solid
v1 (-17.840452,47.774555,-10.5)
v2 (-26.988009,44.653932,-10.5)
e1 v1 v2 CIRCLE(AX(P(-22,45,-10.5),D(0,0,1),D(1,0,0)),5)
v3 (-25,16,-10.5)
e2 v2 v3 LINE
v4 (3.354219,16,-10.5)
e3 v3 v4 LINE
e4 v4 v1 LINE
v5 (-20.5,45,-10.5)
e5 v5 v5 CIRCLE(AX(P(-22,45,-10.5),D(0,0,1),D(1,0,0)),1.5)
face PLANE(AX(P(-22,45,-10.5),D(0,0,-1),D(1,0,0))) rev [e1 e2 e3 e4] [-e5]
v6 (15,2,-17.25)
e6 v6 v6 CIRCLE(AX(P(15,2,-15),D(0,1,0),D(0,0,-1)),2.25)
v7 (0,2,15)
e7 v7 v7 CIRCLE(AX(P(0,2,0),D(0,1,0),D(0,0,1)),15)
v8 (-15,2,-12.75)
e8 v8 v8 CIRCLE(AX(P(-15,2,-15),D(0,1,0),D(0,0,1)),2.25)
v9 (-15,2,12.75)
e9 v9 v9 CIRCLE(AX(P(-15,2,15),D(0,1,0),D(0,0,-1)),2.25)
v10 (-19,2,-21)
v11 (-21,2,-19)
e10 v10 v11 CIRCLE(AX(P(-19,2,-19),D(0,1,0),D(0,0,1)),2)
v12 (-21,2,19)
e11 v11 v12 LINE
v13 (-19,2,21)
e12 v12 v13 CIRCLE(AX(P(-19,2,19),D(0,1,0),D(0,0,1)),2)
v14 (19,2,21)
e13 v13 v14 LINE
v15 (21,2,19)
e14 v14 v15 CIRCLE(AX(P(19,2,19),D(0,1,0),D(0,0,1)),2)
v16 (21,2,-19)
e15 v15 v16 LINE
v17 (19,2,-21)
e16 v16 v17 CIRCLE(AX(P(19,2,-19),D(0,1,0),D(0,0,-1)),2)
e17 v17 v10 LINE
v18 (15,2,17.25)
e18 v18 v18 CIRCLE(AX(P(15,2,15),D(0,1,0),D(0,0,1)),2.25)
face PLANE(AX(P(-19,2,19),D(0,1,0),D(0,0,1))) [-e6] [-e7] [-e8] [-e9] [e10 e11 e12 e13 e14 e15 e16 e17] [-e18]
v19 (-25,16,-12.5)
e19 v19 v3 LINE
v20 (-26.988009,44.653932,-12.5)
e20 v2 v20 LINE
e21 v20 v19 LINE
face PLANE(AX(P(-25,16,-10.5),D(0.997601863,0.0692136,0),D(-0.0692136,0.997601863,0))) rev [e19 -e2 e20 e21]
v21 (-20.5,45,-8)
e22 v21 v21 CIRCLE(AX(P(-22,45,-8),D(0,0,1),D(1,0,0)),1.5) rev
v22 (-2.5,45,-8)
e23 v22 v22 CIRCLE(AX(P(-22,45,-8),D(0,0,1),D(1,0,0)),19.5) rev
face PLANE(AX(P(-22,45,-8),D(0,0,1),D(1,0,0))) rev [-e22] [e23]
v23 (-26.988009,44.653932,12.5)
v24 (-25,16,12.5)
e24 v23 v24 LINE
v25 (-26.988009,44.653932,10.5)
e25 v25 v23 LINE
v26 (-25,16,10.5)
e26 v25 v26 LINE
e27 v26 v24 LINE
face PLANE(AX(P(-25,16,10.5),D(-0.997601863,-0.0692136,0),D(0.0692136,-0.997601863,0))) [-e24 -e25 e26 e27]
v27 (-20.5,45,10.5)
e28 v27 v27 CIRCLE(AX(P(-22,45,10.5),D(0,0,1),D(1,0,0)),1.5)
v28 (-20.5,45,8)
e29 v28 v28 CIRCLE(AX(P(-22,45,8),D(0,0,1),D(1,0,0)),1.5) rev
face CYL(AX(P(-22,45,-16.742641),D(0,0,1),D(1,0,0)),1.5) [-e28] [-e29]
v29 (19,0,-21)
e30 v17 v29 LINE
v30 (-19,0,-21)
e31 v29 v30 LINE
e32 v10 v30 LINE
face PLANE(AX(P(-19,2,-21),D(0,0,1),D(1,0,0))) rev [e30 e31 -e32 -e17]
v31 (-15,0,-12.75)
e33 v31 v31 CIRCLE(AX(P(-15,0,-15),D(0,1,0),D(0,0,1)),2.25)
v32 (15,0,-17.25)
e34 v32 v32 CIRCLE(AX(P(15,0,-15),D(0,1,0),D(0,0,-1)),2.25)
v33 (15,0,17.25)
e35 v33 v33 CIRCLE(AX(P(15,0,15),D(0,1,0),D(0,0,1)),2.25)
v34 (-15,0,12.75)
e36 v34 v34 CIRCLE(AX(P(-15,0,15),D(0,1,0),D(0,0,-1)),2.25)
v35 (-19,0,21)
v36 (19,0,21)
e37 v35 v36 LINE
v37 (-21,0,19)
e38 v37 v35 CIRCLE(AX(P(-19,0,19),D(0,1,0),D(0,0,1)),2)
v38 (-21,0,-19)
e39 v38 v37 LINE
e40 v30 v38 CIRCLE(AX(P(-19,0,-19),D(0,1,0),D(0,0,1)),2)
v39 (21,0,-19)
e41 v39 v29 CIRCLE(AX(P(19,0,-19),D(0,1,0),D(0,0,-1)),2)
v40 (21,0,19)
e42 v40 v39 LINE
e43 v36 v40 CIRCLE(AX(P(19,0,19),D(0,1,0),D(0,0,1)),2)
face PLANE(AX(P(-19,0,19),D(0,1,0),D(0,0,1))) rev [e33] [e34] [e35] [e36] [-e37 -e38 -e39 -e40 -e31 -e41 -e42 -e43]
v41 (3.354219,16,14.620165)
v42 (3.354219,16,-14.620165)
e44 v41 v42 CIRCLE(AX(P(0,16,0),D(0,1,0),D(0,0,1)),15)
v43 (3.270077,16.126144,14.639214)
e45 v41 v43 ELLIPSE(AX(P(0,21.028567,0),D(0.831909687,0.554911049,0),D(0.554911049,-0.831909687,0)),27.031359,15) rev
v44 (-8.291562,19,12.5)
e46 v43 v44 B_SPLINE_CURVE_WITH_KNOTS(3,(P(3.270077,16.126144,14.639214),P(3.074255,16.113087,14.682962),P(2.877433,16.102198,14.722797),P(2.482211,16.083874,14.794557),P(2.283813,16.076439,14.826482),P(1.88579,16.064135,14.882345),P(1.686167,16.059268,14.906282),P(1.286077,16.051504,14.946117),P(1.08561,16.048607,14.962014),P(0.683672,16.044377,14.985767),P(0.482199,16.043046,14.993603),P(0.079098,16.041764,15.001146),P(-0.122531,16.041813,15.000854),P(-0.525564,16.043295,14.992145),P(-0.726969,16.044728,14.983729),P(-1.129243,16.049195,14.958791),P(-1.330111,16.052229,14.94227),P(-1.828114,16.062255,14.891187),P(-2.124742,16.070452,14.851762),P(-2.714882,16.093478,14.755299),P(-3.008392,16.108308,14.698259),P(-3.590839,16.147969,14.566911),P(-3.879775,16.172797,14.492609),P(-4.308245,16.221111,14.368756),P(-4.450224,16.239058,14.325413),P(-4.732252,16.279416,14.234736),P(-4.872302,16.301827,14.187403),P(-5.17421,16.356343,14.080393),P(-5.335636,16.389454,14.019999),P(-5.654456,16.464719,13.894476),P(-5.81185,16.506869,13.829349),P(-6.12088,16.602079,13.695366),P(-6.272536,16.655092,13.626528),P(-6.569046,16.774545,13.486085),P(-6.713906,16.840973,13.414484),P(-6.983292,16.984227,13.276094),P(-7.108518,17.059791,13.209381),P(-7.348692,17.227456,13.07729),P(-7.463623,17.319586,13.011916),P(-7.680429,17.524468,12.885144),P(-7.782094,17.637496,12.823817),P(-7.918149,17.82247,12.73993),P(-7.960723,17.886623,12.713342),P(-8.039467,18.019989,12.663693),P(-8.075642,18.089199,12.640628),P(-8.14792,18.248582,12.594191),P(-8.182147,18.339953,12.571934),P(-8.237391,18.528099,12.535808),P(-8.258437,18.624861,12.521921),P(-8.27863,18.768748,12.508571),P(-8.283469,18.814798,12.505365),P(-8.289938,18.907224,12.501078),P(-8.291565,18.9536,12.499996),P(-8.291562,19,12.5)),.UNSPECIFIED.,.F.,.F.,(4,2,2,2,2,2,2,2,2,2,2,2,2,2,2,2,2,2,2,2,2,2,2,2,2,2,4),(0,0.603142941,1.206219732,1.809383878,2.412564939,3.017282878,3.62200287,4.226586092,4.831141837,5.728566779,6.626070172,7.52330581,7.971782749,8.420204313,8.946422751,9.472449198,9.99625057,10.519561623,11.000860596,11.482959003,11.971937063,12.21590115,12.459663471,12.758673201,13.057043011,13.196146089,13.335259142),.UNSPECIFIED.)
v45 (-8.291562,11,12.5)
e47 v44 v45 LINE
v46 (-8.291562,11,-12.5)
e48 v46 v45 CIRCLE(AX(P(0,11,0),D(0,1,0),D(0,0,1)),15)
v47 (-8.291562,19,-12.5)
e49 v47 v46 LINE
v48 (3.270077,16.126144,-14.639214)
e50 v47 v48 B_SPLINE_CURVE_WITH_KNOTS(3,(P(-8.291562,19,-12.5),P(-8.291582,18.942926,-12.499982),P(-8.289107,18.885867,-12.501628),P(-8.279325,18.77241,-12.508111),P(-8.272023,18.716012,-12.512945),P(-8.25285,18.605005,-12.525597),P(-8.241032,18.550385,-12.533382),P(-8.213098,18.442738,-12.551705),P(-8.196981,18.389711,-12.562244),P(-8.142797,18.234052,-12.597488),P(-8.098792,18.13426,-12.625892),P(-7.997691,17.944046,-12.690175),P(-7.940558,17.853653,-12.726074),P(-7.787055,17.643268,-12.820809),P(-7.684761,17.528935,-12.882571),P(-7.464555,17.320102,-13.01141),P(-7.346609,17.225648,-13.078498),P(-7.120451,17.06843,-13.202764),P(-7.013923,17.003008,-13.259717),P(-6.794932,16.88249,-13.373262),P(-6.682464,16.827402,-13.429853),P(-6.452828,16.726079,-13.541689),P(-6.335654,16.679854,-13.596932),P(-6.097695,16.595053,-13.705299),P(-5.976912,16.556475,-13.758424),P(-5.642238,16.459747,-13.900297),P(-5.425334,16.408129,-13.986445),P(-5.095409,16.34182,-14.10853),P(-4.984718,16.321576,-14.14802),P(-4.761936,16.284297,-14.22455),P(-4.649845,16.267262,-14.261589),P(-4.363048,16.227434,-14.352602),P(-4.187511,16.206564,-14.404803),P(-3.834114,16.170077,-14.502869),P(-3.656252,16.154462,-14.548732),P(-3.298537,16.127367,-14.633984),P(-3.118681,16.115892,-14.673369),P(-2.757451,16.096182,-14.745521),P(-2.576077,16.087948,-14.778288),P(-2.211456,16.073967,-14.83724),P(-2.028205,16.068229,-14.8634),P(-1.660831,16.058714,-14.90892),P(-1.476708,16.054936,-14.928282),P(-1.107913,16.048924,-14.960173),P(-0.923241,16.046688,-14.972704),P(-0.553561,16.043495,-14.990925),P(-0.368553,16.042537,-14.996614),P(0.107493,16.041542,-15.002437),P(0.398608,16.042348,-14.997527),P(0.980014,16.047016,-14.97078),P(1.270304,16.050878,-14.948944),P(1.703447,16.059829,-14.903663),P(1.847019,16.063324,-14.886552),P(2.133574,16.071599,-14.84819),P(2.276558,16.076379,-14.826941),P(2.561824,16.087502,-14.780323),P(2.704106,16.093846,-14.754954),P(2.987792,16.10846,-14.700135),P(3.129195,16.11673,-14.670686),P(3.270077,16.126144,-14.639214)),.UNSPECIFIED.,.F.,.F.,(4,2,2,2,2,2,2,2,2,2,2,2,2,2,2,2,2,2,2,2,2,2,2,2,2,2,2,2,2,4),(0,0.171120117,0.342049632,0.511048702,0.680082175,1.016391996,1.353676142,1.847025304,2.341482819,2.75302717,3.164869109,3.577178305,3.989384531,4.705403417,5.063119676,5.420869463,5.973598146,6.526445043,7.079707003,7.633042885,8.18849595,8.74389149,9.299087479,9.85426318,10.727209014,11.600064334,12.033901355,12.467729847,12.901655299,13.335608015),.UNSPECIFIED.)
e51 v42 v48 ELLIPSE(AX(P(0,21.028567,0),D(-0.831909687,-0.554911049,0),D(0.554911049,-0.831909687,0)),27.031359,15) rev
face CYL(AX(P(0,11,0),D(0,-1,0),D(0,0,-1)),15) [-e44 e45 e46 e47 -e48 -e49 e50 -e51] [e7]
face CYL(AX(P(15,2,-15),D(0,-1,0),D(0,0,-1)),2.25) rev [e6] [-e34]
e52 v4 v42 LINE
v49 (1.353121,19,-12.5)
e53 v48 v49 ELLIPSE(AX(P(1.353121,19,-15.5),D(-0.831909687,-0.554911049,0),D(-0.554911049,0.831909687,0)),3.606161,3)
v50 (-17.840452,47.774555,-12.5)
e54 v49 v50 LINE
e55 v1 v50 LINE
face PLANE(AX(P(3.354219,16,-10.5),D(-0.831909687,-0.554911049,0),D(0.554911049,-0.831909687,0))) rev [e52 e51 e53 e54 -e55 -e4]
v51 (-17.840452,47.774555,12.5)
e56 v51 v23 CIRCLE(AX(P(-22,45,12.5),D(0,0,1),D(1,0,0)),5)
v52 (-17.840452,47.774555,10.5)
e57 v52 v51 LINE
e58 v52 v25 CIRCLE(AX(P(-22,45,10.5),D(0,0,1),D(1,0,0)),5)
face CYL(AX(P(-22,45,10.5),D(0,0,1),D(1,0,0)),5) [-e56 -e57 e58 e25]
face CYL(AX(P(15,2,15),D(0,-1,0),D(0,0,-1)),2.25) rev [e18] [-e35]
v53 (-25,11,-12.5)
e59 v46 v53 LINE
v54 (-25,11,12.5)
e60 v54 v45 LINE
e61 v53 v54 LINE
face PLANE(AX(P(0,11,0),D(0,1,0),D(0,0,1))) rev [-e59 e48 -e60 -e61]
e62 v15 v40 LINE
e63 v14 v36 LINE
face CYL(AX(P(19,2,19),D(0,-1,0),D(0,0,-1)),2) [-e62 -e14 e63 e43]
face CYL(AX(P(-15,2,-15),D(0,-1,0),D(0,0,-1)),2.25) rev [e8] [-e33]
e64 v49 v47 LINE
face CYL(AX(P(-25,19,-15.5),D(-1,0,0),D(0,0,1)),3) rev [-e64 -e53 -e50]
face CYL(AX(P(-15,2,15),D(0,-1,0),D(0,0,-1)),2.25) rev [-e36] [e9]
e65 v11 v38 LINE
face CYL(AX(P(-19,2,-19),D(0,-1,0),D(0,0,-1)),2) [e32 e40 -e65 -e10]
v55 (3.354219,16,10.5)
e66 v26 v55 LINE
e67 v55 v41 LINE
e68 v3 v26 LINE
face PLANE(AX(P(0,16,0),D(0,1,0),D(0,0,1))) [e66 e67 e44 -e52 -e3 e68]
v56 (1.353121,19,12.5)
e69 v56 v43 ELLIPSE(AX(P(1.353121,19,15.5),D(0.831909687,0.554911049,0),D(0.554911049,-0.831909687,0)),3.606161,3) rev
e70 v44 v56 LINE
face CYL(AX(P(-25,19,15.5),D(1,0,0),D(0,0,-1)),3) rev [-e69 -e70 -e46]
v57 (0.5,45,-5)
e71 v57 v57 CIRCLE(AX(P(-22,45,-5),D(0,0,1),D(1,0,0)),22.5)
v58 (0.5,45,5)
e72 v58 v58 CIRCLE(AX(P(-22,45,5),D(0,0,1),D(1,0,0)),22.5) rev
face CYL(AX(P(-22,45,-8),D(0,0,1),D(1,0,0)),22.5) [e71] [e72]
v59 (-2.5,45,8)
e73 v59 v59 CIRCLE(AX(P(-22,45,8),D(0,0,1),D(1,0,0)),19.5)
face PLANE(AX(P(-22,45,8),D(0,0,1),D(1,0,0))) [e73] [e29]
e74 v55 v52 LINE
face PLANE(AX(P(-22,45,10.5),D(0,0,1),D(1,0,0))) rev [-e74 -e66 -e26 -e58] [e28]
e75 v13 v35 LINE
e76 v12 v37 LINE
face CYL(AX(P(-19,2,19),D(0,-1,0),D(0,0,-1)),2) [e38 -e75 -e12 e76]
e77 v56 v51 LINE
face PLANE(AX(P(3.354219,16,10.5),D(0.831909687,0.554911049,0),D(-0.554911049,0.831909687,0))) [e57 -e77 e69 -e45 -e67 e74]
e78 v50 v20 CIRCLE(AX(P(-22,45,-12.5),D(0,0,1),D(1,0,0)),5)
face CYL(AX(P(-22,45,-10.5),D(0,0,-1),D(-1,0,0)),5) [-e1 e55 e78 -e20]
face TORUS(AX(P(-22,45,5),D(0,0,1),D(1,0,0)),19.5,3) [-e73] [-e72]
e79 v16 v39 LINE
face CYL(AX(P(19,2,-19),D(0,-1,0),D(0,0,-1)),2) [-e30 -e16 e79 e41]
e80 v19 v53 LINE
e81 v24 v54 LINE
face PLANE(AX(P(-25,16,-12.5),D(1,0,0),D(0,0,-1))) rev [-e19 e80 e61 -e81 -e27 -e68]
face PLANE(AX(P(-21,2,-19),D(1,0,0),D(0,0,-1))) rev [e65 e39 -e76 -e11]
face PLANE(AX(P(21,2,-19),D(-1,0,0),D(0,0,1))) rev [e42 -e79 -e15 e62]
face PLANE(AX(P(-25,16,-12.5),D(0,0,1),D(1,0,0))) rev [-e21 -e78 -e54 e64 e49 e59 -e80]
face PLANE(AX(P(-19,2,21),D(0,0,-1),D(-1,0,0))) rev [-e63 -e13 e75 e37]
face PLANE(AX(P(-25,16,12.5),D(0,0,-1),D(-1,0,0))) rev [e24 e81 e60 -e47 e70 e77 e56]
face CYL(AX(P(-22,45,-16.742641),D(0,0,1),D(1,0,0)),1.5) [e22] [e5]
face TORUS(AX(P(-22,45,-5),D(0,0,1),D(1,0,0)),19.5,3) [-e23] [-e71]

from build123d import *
from build123d.topology import SkipClean

# Parameters (mm, degrees)
SKETCH1_R                = 2.25
BOSS_EXTRUDE1_DEPTH      = 2
SKETCH2_R                = 15
BOSS_EXTRUDE2_DEPTH      = 9
BOSS_EXTRUDE3_DEPTH      = 5
SKETCH4_R                = 1.5
BOSS_EXTRUDE4_DEPTH      = 2
FILLET1_R                = 3
BOSS_EXTRUDE5_DEPTH      = 8
BOSS_EXTRUDE5_DEPTH_BACK = 8
SKETCH5_R                = 22.5
FILLET2_R                = 3
SKETCH6_R                = 1.5
BOSS_EXTRUDE6_DEPTH      = 25


with BuildPart() as part:
    # Sketch1 → Boss-Extrude1 (new body)
    with BuildSketch(Plane(origin=(0, 0, 0), x_dir=(1, 0, 0), z_dir=(0, 1, 0))):
        with BuildLine():
            Line((-19, 21), (19, 21))
            ThreePointArc((19, 21), (20.414213562, 20.414213562), (21, 19))
            Line((21, 19), (21, -19))
            ThreePointArc((21, -19), (20.414213562, -20.414213562), (19, -21))
            Line((19, -21), (-19, -21))
            ThreePointArc((-19, -21), (-20.414213562, -20.414213562), (-21, -19))
            Line((-21, -19), (-21, 19))
            ThreePointArc((-21, 19), (-20.414213562, 20.414213562), (-19, 21))
        make_face()
        with Locations(Location((-15, 15, 0), (0, 0, 270))):
            Circle(SKETCH1_R, mode=Mode.SUBTRACT)
        with Locations(Location((15, 15, 0), (0, 0, 90))):
            Circle(SKETCH1_R, mode=Mode.SUBTRACT)
        with Locations(Location((15, -15, 0), (0, 0, 270))):
            Circle(SKETCH1_R, mode=Mode.SUBTRACT)
        with Locations(Location((-15, -15, 0), (0, 0, 90))):
            Circle(SKETCH1_R, mode=Mode.SUBTRACT)
    extrude(amount=BOSS_EXTRUDE1_DEPTH)

    # Sketch2 → Boss-Extrude2 (add)
    with BuildSketch(Plane(origin=(0, 2, 0), x_dir=(1, 0, 0), z_dir=(0, 1, 0))):
        with Locations(Location((0, 0, 0), (0, 0, 270))):
            Circle(SKETCH2_R)
    extrude(amount=BOSS_EXTRUDE2_DEPTH)

    # Sketch3 → Boss-Extrude3 (add)
    with SkipClean():  # the faces are left unmerged after this step: merging them gives an invalid solid
        with BuildSketch(Plane(origin=(0, 11, 0), x_dir=(1, 0, 0), z_dir=(0, 1, 0))):
            with BuildLine():
                Line((-25, 12.5), (-8.291561976, 12.5))
                ThreePointArc((-8.291561976, 12.5), (15, 0), (-8.291561976, -12.5))
                Line((-8.291561976, -12.5), (-25, -12.5))
                Line((-25, -12.5), (-25, 12.5))
            make_face()
        extrude(amount=BOSS_EXTRUDE3_DEPTH)

    # Sketch4 → Boss-Extrude4 (add)
    with SkipClean():  # the faces are left unmerged after this step: merging them gives an invalid solid
        with BuildSketch(Plane.XY.offset(12.5)):
            with BuildLine():
                Line((-25, 16), (-26.988009316, 44.653931998))
                ThreePointArc((-26.988009316, 44.653931998), (-23.614360312, 49.732213096), (-17.840451563, 47.774555244))
                Line((-17.840451563, 47.774555244), (3.354219012, 16))
                Line((3.354219012, 16), (-25, 16))
            make_face()
            with Locations((-22, 45)):
                Circle(SKETCH4_R, mode=Mode.SUBTRACT)
        boss_extrude4 = extrude(amount=-BOSS_EXTRUDE4_DEPTH)

    # Mirror1: Boss-Extrude4 across plane
    with SkipClean():  # the faces are left unmerged after this step: merging them gives an invalid solid
        add(boss_extrude4.mirror(Plane.XY))

    # Fillet1
    # the kernel refuses this fillet: 3 mm, written as the material it adds along each edge
    with BuildSketch(Plane(origin=(10.854219012, 16, 12.5), x_dir=(0, 0, 1), z_dir=(-1, 0, 0))) as fillet1_piece_1_section:
        with BuildLine():
            CenterArc((FILLET1_R, FILLET1_R), FILLET1_R, 180, 90)
            Line((0, FILLET1_R), (0, 0))
            Line((0, 0), (FILLET1_R, 0))
        make_face()
    fillet1_piece_1 = extrude(amount=26.645780988, mode=Mode.PRIVATE)
    fillet1_piece_1 = fillet1_piece_1 & Plane(origin=(0, 16.711249506, 0), x_dir=(-0.5527707983925666, 0, -0.8333333333333335), z_dir=(0, -1, 0)) * Cylinder(15, 66, mode=Mode.PRIVATE)
    fillet1_piece_1 = split(fillet1_piece_1, bisect_by=Plane(origin=(1.321328689, 19.047661706, 13.078964715), z_dir=(-0.8319096874112317, -0.5549110487198348, 0)), keep=Keep.TOP, mode=Mode.PRIVATE)
    add(fillet1_piece_1)
    with BuildSketch(Plane(origin=(10.854219012, 16, -12.5), x_dir=(0, 0, -1), z_dir=(-1, 0, 0))) as fillet1_piece_2_section:
        with BuildLine():
            CenterArc((FILLET1_R, -FILLET1_R), FILLET1_R, 90, 90)
            Line((0, -FILLET1_R), (0, 0))
            Line((0, 0), (FILLET1_R, 0))
        make_face()
    fillet1_piece_2 = extrude(amount=26.645780988, mode=Mode.PRIVATE)
    fillet1_piece_2 = fillet1_piece_2 & Plane(origin=(0, 16.711251501, 0), x_dir=(-0.5527707983925666, 0, -0.8333333333333335), z_dir=(0, -1, 0)) * Cylinder(15, 66, mode=Mode.PRIVATE)
    fillet1_piece_2 = split(fillet1_piece_2, bisect_by=Plane(origin=(1.321327042, 19.047664174, -13.078969709), z_dir=(-0.8319096874112317, -0.5549110487198348, 0)), keep=Keep.TOP, mode=Mode.PRIVATE)
    add(fillet1_piece_2)



with BuildPart() as body_2:
    # Sketch5 → Boss-Extrude5 (new, two sides: drawn at the far end of the back side and taken through both)
    with BuildSketch(Plane.XY.offset(-BOSS_EXTRUDE5_DEPTH_BACK)):
        with Locations((-22, 45)):
            Circle(SKETCH5_R)
    extrude(amount=BOSS_EXTRUDE5_DEPTH + BOSS_EXTRUDE5_DEPTH_BACK)

    # Fillet2
    fillet2_edges = [body_2.edges().sort_by_distance(p)[0] for p in [
        (-44.5, 45, 8),
        (-44.5, 45, -8),
    ]]
    fillet(fillet2_edges, radius=FILLET2_R)


with BuildPart() as part_1:
    add(part.part)

    add(body_2.part)  # Boss-Extrude6 merges body 2
    # Sketch6 → Boss-Extrude6 (add)
    with BuildSketch(Plane.XY.offset(12.5)):
        with Locations((-22, 45)):
            Circle(SKETCH6_R)
    extrude(amount=-BOSS_EXTRUDE6_DEPTH)


solid = part_1.part
